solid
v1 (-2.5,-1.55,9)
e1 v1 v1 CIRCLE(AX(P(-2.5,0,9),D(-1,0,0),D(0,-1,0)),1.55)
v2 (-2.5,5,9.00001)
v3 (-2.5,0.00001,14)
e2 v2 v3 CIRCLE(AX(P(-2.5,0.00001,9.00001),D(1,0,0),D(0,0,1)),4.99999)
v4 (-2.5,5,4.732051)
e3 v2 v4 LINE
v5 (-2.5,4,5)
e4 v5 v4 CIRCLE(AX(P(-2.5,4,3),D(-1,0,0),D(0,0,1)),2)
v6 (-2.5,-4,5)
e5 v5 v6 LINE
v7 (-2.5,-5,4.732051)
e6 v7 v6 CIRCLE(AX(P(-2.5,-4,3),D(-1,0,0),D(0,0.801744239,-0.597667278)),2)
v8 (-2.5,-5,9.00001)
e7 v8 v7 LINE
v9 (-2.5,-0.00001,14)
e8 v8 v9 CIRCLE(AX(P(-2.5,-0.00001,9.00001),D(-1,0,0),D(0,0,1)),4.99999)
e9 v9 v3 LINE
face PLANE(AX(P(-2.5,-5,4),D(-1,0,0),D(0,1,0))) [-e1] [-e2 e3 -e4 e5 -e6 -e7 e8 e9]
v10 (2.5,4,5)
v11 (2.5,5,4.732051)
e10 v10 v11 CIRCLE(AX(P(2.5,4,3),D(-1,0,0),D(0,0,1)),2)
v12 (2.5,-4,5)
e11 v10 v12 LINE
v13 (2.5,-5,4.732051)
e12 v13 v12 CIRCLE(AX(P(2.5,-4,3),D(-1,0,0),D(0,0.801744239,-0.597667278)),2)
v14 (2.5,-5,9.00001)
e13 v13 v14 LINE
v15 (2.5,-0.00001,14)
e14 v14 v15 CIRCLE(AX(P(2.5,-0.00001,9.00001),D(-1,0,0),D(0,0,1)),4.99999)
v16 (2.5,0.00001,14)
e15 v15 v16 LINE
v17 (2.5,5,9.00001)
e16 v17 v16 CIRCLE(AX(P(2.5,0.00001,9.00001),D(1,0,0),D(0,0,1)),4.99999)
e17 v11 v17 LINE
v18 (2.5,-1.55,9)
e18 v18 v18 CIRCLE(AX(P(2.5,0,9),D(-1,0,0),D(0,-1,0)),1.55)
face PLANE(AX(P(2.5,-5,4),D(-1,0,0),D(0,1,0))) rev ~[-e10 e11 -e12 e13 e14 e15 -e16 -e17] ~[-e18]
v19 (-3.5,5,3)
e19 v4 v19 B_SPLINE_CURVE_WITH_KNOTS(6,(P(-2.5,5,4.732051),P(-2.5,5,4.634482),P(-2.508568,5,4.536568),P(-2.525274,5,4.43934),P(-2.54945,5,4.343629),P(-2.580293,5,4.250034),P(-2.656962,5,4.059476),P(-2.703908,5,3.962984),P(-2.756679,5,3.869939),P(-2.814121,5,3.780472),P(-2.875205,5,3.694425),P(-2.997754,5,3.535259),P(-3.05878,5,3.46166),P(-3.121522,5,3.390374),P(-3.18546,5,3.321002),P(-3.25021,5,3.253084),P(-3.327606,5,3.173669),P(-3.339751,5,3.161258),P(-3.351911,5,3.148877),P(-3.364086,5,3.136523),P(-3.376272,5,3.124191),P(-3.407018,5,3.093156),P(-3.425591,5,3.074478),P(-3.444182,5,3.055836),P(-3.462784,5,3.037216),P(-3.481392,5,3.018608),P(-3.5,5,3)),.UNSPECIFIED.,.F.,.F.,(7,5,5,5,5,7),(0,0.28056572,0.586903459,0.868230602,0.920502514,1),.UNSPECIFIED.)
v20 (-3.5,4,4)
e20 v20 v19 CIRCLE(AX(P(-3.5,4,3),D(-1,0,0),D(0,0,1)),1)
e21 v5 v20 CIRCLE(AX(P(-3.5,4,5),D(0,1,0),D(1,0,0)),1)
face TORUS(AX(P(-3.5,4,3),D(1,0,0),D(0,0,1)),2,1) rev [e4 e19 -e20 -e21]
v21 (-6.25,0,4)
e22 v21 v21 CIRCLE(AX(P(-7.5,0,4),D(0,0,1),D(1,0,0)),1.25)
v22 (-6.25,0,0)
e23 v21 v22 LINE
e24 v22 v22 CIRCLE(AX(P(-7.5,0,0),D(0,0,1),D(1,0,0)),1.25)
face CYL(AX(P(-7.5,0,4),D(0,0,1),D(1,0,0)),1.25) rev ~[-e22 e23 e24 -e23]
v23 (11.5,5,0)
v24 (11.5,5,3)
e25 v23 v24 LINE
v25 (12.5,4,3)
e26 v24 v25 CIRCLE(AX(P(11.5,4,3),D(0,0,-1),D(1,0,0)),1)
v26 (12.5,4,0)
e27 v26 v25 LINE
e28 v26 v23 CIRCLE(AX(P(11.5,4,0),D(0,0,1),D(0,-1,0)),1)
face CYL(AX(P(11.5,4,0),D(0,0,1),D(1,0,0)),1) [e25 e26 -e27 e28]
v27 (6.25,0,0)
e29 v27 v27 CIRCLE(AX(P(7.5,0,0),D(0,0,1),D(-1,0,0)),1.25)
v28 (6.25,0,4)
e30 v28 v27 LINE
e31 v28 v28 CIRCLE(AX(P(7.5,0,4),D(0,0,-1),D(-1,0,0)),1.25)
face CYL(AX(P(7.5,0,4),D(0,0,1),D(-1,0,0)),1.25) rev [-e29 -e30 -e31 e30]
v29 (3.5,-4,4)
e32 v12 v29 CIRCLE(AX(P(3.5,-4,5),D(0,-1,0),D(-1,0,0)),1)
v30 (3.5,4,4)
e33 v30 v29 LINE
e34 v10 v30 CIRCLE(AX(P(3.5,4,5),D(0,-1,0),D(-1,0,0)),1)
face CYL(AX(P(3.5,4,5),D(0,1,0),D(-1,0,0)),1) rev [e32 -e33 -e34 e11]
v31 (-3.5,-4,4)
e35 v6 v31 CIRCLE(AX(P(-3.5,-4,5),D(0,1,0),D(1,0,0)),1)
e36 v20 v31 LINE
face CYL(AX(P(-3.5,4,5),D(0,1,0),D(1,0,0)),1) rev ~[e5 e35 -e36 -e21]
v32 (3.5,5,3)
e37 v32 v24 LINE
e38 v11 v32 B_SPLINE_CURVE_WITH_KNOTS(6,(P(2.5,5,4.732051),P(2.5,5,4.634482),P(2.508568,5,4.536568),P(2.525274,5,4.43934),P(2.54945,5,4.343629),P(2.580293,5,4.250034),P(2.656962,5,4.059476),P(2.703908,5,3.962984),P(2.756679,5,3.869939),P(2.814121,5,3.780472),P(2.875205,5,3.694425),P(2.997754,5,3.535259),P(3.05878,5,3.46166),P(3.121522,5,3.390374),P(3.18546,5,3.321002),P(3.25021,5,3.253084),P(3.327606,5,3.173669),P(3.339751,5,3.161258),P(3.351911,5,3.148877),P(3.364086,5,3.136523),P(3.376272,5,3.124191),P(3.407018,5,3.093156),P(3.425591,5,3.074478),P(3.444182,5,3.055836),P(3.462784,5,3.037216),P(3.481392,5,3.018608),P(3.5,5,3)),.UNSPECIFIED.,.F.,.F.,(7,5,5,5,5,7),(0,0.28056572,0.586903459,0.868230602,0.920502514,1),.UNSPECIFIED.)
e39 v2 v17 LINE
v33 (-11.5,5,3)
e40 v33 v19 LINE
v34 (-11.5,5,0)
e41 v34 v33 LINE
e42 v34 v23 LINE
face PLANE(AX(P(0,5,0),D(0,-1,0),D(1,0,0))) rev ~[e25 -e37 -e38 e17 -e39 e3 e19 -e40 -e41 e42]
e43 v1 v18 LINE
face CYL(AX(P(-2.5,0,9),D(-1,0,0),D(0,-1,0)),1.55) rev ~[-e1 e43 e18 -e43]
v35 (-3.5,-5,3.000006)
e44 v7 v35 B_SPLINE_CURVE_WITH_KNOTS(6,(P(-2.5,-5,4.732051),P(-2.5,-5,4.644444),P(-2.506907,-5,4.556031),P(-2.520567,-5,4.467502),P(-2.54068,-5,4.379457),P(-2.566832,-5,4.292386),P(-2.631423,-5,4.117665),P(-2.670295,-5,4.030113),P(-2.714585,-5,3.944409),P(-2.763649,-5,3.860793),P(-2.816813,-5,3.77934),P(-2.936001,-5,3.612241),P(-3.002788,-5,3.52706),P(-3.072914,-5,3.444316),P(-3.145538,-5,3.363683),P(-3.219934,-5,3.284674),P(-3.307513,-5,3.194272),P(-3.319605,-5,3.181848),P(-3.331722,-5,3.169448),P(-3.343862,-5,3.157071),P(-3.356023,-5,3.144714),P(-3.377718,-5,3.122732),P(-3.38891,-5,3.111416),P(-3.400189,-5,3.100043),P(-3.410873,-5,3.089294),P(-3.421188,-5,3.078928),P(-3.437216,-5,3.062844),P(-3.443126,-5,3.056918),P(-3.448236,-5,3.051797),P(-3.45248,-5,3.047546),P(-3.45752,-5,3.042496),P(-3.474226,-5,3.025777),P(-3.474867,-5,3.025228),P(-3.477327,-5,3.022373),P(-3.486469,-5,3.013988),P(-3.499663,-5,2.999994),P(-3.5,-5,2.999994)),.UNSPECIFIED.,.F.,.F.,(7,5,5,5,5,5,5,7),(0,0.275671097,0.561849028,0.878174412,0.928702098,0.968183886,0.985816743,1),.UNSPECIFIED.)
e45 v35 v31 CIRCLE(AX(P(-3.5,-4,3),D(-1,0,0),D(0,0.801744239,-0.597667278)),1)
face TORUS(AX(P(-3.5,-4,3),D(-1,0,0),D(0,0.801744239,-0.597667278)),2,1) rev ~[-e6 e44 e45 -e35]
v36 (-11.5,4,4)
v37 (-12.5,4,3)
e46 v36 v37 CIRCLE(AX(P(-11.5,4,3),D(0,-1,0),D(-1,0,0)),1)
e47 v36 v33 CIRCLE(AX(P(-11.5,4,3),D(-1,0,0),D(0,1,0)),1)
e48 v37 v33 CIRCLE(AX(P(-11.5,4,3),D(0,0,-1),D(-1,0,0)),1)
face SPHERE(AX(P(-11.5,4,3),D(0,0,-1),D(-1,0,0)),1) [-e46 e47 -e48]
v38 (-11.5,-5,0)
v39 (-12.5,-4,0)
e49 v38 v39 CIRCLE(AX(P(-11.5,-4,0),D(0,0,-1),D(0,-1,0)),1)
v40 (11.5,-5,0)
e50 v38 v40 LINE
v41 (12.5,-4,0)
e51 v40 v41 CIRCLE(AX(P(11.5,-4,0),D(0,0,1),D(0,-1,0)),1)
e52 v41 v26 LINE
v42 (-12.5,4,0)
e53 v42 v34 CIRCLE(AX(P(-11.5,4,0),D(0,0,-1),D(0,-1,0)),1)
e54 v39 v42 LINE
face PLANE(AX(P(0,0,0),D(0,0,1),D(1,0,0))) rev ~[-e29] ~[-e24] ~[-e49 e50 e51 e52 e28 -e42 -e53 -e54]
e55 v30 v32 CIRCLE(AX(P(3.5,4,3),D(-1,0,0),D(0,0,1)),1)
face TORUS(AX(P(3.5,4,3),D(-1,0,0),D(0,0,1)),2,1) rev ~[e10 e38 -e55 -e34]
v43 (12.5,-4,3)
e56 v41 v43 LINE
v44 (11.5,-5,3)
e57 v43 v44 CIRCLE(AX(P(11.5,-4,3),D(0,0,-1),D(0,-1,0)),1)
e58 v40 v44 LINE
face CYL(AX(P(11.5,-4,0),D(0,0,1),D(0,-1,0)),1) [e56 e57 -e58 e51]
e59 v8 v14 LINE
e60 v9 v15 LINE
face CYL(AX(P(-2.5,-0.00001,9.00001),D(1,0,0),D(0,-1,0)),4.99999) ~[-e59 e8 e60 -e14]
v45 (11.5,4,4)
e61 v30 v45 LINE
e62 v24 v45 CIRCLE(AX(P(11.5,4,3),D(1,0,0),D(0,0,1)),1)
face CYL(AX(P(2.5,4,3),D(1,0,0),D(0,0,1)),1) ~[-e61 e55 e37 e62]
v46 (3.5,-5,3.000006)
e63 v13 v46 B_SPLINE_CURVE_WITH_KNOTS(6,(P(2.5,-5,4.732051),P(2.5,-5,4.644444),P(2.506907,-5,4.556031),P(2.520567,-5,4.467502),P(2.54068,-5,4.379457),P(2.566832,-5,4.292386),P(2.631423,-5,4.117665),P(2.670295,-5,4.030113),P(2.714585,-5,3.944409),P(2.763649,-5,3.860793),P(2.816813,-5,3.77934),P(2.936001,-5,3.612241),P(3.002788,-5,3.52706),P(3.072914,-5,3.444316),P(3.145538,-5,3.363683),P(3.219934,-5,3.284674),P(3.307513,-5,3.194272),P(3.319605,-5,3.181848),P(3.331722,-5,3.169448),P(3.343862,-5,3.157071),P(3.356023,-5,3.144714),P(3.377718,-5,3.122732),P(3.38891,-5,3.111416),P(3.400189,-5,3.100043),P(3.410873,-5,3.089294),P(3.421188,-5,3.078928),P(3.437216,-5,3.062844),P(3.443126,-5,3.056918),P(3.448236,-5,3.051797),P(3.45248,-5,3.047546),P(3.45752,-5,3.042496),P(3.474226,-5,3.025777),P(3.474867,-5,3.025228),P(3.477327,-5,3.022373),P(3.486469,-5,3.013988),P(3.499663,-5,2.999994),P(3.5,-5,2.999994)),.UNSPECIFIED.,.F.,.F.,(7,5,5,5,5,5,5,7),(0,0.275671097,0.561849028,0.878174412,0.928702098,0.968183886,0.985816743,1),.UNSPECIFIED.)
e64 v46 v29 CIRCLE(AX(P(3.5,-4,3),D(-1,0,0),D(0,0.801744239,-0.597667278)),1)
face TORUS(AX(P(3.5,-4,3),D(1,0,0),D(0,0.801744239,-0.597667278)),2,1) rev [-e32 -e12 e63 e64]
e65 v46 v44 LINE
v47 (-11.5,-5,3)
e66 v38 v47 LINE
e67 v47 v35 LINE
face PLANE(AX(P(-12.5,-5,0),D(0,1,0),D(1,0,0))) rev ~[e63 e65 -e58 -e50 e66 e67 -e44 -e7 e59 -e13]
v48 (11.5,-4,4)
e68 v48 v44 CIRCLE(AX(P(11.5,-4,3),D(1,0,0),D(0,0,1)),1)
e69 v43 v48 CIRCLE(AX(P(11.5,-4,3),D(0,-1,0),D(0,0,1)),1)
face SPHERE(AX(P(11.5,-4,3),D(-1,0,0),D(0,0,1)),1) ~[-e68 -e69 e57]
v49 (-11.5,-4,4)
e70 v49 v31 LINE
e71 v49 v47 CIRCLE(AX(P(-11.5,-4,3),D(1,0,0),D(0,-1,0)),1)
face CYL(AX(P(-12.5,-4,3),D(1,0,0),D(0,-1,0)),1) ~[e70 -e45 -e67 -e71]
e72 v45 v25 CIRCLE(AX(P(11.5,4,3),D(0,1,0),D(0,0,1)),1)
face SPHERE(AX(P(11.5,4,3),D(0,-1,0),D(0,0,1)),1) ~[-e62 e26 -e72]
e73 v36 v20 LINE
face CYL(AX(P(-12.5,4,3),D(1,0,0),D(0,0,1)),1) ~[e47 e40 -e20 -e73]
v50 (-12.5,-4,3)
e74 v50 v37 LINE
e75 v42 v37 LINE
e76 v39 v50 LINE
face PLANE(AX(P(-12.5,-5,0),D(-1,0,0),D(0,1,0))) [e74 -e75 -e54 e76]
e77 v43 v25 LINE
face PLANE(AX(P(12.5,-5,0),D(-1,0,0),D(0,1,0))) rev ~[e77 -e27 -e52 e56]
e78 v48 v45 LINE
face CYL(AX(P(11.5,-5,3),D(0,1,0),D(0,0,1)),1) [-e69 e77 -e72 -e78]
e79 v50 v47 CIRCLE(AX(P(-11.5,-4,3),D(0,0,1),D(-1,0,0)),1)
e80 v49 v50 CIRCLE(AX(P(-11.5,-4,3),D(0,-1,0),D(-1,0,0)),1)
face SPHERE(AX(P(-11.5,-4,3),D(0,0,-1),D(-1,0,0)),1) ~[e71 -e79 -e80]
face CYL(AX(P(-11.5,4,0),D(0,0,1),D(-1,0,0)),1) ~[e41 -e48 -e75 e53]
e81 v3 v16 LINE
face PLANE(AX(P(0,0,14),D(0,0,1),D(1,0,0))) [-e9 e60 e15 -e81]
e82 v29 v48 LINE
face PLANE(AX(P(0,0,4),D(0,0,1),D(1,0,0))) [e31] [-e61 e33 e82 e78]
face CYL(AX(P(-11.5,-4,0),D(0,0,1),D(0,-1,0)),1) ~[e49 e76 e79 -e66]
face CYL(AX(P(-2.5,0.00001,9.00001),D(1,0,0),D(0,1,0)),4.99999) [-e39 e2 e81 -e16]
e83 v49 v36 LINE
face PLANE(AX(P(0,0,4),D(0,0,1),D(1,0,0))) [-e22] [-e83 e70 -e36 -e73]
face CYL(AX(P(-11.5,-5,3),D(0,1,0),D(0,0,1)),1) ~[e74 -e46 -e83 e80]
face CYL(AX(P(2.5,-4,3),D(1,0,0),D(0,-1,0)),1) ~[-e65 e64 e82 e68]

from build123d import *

# Parameters (mm, degrees)
F0_W          = 25
F0_H          = 10
F1_DEPTH      = 4
F2_W          = 5
F2_H          = 10
F3_DEPTH      = 10
F4_R          = 1.25
F5_DEPTH      = 4.001
F7_R          = 4.99999
F8_R          = 1.55
F9_DEPTH      = 15.001
F10_R         = 1
F11_T1_DEPTH  = 8
F11_T6_ANGLE  = 233.2969892374
F11_T11_ANGLE = 233.2969892374
F11_T16_ANGLE = 233.2969892374
F11_T21_ANGLE = 233.2969892374


# Not quite as in the source:
# - a fillet or chamfer that OpenCascade refuses, or shapes differently, is made with other operations: its cross-section is extruded or revolved along the edge and cut away or added
# - a fillet or chamfer is up to 0.001 mm smaller than in the source, because OpenCascade refuses the exact size
# - a pattern or mirror of a feature is missing from the dataset's text; its kind, count and spacing are read off the source's solid


with BuildPart() as f1:
    # F0 (on Top) → F1 (new body)
    with BuildSketch(Plane.XY):
        Rectangle(F0_W, F0_H)
    extrude(amount=F1_DEPTH)

    # F2 (on face) → F3 (join)
    with BuildSketch(Plane.XY.offset(4)):
        Rectangle(F2_W, F2_H)
    extrude(amount=F3_DEPTH)

    # F4 (on face) → F5 (cut, through all)
    with BuildSketch(Plane.XY.offset(4)):
        with Locations((-7.5, 0)):
            Circle(F4_R)
    f5 = extrude(amount=-F5_DEPTH, mode=Mode.SUBTRACT)

    # F5_copies: F5 across plane
    add(f5.mirror(Plane(origin=(0, 0, 0), x_dir=(0, 0, 1), z_dir=(1, 0, 0))), mode=Mode.SUBTRACT)

    # F7 (radius 5 in the source; OpenCascade refuses exactly that, so slightly less here)
    f7_edges = [f1.edges().sort_by_distance(p)[0] for p in [
        (0, -5, 14),
        (0, 5, 14),
    ]]
    fillet(f7_edges, radius=F7_R)

    # F8 (on face) → F9 (cut, through all)
    with BuildSketch(Plane(origin=(-2.5, 0, 0), x_dir=(0, -1, 0), z_dir=(-1, 0, 0))):
        with Locations((0, 9)):
            Circle(F8_R)
    extrude(amount=-F9_DEPTH, mode=Mode.SUBTRACT)

    # F10
    f10_edges = [f1.edges().sort_by_distance(p)[0] for p in [
        (7.5, -5, 4),
        (12.5, 0, 4),
        (7.5, 5, 4),
        (12.5, -5, 2),
        (12.5, 5, 2),
        (-12.5, -5, 2),
        (-12.5, 5, 2),
        (-12.5, 0, 4),
        (-7.5, -5, 4),
        (-7.5, 5, 4),
    ]]
    fillet(f10_edges, radius=F10_R)

    # F11: fillet of radius 1 on 2 edges, made by hand

    # F11_s2 → F11_t1 (join)
    with BuildSketch(Plane.XZ.offset(-4)):
        with BuildLine():
            ThreePointArc((2.5, 5), (2.7928932188, 4.2928932188), (3.5, 4))
            Line((3.5, 4), (2.5, 4))
            Line((2.5, 4), (2.5, 5))
        make_face()
        with BuildLine():
            ThreePointArc((-2.5, 5), (-2.7928932188, 4.2928932188), (-3.5, 4))
            Line((-3.5, 4), (-2.5, 4))
            Line((-2.5, 4), (-2.5, 5))
        make_face()
    extrude(amount=F11_T1_DEPTH)


with BuildPart() as f11_tool4:
    # F11_s5 → F11_t6 (revolve)
    with BuildSketch(Plane.XZ.offset(-4)):
        with BuildLine():
            ThreePointArc((-2.5, 5), (-2.7928932188, 4.2928932188), (-3.5, 4))
            Line((-3.5, 4), (-2.5, 4))
            Line((-2.5, 4), (-2.5, 5))
        make_face()
    revolve(axis=Axis((-2.5, 4, 3), (-1, 0, 0)), revolution_arc=F11_T6_ANGLE)

    split(bisect_by=Plane.XZ.offset(-5), keep=Keep.TOP)


with BuildPart() as f1_1:
    add(f1.part)

    # F11_t3: union F11_tool4
    add(f11_tool4.part)


with BuildPart() as f11_tool9:
    # F11_s10 → F11_t11 (revolve)
    with BuildSketch(Plane(origin=(0, 0.0087041916, 0.0116762883), x_dir=(1, 0, 0), z_dir=(0, 0.5976672776, 0.8017442393))):
        with BuildLine():
            ThreePointArc((-3.5, -3.9999787901), (-2.7928932188, -3.7070855713), (-2.5, -2.9999787901))
            Line((-2.5, -2.9999787901), (-2.5, -3.9999787901))
            Line((-2.5, -3.9999787901), (-3.5, -3.9999787901))
        make_face()
    revolve(axis=Axis((-2.5, -4, 3), (-1, 0, 0)), revolution_arc=F11_T11_ANGLE)

    split(bisect_by=Plane.XZ.offset(5), keep=Keep.BOTTOM)


with BuildPart() as f1_2:
    add(f1_1.part)

    # F11_t8: union F11_tool9
    add(f11_tool9.part)


with BuildPart() as f11_tool14:
    # F11_s15 → F11_t16 (revolve)
    with BuildSketch(Plane(origin=(0, 0.0087041916, 0.0116762883), x_dir=(1, 0, 0), z_dir=(0, 0.5976672776, 0.8017442393))):
        with BuildLine():
            ThreePointArc((3.5, -3.9999787901), (2.7928932188, -3.7070855713), (2.5, -2.9999787901))
            Line((2.5, -2.9999787901), (2.5, -3.9999787901))
            Line((2.5, -3.9999787901), (3.5, -3.9999787901))
        make_face()
    revolve(axis=Axis((2.5, -4, 3), (-1, 0, 0)), revolution_arc=F11_T16_ANGLE)

    split(bisect_by=Plane.XZ.offset(5), keep=Keep.BOTTOM)


with BuildPart() as f1_3:
    add(f1_2.part)

    # F11_t13: union F11_tool14
    add(f11_tool14.part)


with BuildPart() as f11_tool19:
    # F11_s20 → F11_t21 (revolve)
    with BuildSketch(Plane.XZ.offset(-4)):
        with BuildLine():
            ThreePointArc((2.5, 5), (2.7928932188, 4.2928932188), (3.5, 4))
            Line((3.5, 4), (2.5, 4))
            Line((2.5, 4), (2.5, 5))
        make_face()
    revolve(axis=Axis((2.5, 4, 3), (-1, 0, 0)), revolution_arc=F11_T21_ANGLE)

    split(bisect_by=Plane.XZ.offset(-5), keep=Keep.TOP)


with BuildPart() as f1_4:
    add(f1_3.part)

    # F11_t18: union F11_tool19
    add(f11_tool19.part)


solid = f1_4.part
